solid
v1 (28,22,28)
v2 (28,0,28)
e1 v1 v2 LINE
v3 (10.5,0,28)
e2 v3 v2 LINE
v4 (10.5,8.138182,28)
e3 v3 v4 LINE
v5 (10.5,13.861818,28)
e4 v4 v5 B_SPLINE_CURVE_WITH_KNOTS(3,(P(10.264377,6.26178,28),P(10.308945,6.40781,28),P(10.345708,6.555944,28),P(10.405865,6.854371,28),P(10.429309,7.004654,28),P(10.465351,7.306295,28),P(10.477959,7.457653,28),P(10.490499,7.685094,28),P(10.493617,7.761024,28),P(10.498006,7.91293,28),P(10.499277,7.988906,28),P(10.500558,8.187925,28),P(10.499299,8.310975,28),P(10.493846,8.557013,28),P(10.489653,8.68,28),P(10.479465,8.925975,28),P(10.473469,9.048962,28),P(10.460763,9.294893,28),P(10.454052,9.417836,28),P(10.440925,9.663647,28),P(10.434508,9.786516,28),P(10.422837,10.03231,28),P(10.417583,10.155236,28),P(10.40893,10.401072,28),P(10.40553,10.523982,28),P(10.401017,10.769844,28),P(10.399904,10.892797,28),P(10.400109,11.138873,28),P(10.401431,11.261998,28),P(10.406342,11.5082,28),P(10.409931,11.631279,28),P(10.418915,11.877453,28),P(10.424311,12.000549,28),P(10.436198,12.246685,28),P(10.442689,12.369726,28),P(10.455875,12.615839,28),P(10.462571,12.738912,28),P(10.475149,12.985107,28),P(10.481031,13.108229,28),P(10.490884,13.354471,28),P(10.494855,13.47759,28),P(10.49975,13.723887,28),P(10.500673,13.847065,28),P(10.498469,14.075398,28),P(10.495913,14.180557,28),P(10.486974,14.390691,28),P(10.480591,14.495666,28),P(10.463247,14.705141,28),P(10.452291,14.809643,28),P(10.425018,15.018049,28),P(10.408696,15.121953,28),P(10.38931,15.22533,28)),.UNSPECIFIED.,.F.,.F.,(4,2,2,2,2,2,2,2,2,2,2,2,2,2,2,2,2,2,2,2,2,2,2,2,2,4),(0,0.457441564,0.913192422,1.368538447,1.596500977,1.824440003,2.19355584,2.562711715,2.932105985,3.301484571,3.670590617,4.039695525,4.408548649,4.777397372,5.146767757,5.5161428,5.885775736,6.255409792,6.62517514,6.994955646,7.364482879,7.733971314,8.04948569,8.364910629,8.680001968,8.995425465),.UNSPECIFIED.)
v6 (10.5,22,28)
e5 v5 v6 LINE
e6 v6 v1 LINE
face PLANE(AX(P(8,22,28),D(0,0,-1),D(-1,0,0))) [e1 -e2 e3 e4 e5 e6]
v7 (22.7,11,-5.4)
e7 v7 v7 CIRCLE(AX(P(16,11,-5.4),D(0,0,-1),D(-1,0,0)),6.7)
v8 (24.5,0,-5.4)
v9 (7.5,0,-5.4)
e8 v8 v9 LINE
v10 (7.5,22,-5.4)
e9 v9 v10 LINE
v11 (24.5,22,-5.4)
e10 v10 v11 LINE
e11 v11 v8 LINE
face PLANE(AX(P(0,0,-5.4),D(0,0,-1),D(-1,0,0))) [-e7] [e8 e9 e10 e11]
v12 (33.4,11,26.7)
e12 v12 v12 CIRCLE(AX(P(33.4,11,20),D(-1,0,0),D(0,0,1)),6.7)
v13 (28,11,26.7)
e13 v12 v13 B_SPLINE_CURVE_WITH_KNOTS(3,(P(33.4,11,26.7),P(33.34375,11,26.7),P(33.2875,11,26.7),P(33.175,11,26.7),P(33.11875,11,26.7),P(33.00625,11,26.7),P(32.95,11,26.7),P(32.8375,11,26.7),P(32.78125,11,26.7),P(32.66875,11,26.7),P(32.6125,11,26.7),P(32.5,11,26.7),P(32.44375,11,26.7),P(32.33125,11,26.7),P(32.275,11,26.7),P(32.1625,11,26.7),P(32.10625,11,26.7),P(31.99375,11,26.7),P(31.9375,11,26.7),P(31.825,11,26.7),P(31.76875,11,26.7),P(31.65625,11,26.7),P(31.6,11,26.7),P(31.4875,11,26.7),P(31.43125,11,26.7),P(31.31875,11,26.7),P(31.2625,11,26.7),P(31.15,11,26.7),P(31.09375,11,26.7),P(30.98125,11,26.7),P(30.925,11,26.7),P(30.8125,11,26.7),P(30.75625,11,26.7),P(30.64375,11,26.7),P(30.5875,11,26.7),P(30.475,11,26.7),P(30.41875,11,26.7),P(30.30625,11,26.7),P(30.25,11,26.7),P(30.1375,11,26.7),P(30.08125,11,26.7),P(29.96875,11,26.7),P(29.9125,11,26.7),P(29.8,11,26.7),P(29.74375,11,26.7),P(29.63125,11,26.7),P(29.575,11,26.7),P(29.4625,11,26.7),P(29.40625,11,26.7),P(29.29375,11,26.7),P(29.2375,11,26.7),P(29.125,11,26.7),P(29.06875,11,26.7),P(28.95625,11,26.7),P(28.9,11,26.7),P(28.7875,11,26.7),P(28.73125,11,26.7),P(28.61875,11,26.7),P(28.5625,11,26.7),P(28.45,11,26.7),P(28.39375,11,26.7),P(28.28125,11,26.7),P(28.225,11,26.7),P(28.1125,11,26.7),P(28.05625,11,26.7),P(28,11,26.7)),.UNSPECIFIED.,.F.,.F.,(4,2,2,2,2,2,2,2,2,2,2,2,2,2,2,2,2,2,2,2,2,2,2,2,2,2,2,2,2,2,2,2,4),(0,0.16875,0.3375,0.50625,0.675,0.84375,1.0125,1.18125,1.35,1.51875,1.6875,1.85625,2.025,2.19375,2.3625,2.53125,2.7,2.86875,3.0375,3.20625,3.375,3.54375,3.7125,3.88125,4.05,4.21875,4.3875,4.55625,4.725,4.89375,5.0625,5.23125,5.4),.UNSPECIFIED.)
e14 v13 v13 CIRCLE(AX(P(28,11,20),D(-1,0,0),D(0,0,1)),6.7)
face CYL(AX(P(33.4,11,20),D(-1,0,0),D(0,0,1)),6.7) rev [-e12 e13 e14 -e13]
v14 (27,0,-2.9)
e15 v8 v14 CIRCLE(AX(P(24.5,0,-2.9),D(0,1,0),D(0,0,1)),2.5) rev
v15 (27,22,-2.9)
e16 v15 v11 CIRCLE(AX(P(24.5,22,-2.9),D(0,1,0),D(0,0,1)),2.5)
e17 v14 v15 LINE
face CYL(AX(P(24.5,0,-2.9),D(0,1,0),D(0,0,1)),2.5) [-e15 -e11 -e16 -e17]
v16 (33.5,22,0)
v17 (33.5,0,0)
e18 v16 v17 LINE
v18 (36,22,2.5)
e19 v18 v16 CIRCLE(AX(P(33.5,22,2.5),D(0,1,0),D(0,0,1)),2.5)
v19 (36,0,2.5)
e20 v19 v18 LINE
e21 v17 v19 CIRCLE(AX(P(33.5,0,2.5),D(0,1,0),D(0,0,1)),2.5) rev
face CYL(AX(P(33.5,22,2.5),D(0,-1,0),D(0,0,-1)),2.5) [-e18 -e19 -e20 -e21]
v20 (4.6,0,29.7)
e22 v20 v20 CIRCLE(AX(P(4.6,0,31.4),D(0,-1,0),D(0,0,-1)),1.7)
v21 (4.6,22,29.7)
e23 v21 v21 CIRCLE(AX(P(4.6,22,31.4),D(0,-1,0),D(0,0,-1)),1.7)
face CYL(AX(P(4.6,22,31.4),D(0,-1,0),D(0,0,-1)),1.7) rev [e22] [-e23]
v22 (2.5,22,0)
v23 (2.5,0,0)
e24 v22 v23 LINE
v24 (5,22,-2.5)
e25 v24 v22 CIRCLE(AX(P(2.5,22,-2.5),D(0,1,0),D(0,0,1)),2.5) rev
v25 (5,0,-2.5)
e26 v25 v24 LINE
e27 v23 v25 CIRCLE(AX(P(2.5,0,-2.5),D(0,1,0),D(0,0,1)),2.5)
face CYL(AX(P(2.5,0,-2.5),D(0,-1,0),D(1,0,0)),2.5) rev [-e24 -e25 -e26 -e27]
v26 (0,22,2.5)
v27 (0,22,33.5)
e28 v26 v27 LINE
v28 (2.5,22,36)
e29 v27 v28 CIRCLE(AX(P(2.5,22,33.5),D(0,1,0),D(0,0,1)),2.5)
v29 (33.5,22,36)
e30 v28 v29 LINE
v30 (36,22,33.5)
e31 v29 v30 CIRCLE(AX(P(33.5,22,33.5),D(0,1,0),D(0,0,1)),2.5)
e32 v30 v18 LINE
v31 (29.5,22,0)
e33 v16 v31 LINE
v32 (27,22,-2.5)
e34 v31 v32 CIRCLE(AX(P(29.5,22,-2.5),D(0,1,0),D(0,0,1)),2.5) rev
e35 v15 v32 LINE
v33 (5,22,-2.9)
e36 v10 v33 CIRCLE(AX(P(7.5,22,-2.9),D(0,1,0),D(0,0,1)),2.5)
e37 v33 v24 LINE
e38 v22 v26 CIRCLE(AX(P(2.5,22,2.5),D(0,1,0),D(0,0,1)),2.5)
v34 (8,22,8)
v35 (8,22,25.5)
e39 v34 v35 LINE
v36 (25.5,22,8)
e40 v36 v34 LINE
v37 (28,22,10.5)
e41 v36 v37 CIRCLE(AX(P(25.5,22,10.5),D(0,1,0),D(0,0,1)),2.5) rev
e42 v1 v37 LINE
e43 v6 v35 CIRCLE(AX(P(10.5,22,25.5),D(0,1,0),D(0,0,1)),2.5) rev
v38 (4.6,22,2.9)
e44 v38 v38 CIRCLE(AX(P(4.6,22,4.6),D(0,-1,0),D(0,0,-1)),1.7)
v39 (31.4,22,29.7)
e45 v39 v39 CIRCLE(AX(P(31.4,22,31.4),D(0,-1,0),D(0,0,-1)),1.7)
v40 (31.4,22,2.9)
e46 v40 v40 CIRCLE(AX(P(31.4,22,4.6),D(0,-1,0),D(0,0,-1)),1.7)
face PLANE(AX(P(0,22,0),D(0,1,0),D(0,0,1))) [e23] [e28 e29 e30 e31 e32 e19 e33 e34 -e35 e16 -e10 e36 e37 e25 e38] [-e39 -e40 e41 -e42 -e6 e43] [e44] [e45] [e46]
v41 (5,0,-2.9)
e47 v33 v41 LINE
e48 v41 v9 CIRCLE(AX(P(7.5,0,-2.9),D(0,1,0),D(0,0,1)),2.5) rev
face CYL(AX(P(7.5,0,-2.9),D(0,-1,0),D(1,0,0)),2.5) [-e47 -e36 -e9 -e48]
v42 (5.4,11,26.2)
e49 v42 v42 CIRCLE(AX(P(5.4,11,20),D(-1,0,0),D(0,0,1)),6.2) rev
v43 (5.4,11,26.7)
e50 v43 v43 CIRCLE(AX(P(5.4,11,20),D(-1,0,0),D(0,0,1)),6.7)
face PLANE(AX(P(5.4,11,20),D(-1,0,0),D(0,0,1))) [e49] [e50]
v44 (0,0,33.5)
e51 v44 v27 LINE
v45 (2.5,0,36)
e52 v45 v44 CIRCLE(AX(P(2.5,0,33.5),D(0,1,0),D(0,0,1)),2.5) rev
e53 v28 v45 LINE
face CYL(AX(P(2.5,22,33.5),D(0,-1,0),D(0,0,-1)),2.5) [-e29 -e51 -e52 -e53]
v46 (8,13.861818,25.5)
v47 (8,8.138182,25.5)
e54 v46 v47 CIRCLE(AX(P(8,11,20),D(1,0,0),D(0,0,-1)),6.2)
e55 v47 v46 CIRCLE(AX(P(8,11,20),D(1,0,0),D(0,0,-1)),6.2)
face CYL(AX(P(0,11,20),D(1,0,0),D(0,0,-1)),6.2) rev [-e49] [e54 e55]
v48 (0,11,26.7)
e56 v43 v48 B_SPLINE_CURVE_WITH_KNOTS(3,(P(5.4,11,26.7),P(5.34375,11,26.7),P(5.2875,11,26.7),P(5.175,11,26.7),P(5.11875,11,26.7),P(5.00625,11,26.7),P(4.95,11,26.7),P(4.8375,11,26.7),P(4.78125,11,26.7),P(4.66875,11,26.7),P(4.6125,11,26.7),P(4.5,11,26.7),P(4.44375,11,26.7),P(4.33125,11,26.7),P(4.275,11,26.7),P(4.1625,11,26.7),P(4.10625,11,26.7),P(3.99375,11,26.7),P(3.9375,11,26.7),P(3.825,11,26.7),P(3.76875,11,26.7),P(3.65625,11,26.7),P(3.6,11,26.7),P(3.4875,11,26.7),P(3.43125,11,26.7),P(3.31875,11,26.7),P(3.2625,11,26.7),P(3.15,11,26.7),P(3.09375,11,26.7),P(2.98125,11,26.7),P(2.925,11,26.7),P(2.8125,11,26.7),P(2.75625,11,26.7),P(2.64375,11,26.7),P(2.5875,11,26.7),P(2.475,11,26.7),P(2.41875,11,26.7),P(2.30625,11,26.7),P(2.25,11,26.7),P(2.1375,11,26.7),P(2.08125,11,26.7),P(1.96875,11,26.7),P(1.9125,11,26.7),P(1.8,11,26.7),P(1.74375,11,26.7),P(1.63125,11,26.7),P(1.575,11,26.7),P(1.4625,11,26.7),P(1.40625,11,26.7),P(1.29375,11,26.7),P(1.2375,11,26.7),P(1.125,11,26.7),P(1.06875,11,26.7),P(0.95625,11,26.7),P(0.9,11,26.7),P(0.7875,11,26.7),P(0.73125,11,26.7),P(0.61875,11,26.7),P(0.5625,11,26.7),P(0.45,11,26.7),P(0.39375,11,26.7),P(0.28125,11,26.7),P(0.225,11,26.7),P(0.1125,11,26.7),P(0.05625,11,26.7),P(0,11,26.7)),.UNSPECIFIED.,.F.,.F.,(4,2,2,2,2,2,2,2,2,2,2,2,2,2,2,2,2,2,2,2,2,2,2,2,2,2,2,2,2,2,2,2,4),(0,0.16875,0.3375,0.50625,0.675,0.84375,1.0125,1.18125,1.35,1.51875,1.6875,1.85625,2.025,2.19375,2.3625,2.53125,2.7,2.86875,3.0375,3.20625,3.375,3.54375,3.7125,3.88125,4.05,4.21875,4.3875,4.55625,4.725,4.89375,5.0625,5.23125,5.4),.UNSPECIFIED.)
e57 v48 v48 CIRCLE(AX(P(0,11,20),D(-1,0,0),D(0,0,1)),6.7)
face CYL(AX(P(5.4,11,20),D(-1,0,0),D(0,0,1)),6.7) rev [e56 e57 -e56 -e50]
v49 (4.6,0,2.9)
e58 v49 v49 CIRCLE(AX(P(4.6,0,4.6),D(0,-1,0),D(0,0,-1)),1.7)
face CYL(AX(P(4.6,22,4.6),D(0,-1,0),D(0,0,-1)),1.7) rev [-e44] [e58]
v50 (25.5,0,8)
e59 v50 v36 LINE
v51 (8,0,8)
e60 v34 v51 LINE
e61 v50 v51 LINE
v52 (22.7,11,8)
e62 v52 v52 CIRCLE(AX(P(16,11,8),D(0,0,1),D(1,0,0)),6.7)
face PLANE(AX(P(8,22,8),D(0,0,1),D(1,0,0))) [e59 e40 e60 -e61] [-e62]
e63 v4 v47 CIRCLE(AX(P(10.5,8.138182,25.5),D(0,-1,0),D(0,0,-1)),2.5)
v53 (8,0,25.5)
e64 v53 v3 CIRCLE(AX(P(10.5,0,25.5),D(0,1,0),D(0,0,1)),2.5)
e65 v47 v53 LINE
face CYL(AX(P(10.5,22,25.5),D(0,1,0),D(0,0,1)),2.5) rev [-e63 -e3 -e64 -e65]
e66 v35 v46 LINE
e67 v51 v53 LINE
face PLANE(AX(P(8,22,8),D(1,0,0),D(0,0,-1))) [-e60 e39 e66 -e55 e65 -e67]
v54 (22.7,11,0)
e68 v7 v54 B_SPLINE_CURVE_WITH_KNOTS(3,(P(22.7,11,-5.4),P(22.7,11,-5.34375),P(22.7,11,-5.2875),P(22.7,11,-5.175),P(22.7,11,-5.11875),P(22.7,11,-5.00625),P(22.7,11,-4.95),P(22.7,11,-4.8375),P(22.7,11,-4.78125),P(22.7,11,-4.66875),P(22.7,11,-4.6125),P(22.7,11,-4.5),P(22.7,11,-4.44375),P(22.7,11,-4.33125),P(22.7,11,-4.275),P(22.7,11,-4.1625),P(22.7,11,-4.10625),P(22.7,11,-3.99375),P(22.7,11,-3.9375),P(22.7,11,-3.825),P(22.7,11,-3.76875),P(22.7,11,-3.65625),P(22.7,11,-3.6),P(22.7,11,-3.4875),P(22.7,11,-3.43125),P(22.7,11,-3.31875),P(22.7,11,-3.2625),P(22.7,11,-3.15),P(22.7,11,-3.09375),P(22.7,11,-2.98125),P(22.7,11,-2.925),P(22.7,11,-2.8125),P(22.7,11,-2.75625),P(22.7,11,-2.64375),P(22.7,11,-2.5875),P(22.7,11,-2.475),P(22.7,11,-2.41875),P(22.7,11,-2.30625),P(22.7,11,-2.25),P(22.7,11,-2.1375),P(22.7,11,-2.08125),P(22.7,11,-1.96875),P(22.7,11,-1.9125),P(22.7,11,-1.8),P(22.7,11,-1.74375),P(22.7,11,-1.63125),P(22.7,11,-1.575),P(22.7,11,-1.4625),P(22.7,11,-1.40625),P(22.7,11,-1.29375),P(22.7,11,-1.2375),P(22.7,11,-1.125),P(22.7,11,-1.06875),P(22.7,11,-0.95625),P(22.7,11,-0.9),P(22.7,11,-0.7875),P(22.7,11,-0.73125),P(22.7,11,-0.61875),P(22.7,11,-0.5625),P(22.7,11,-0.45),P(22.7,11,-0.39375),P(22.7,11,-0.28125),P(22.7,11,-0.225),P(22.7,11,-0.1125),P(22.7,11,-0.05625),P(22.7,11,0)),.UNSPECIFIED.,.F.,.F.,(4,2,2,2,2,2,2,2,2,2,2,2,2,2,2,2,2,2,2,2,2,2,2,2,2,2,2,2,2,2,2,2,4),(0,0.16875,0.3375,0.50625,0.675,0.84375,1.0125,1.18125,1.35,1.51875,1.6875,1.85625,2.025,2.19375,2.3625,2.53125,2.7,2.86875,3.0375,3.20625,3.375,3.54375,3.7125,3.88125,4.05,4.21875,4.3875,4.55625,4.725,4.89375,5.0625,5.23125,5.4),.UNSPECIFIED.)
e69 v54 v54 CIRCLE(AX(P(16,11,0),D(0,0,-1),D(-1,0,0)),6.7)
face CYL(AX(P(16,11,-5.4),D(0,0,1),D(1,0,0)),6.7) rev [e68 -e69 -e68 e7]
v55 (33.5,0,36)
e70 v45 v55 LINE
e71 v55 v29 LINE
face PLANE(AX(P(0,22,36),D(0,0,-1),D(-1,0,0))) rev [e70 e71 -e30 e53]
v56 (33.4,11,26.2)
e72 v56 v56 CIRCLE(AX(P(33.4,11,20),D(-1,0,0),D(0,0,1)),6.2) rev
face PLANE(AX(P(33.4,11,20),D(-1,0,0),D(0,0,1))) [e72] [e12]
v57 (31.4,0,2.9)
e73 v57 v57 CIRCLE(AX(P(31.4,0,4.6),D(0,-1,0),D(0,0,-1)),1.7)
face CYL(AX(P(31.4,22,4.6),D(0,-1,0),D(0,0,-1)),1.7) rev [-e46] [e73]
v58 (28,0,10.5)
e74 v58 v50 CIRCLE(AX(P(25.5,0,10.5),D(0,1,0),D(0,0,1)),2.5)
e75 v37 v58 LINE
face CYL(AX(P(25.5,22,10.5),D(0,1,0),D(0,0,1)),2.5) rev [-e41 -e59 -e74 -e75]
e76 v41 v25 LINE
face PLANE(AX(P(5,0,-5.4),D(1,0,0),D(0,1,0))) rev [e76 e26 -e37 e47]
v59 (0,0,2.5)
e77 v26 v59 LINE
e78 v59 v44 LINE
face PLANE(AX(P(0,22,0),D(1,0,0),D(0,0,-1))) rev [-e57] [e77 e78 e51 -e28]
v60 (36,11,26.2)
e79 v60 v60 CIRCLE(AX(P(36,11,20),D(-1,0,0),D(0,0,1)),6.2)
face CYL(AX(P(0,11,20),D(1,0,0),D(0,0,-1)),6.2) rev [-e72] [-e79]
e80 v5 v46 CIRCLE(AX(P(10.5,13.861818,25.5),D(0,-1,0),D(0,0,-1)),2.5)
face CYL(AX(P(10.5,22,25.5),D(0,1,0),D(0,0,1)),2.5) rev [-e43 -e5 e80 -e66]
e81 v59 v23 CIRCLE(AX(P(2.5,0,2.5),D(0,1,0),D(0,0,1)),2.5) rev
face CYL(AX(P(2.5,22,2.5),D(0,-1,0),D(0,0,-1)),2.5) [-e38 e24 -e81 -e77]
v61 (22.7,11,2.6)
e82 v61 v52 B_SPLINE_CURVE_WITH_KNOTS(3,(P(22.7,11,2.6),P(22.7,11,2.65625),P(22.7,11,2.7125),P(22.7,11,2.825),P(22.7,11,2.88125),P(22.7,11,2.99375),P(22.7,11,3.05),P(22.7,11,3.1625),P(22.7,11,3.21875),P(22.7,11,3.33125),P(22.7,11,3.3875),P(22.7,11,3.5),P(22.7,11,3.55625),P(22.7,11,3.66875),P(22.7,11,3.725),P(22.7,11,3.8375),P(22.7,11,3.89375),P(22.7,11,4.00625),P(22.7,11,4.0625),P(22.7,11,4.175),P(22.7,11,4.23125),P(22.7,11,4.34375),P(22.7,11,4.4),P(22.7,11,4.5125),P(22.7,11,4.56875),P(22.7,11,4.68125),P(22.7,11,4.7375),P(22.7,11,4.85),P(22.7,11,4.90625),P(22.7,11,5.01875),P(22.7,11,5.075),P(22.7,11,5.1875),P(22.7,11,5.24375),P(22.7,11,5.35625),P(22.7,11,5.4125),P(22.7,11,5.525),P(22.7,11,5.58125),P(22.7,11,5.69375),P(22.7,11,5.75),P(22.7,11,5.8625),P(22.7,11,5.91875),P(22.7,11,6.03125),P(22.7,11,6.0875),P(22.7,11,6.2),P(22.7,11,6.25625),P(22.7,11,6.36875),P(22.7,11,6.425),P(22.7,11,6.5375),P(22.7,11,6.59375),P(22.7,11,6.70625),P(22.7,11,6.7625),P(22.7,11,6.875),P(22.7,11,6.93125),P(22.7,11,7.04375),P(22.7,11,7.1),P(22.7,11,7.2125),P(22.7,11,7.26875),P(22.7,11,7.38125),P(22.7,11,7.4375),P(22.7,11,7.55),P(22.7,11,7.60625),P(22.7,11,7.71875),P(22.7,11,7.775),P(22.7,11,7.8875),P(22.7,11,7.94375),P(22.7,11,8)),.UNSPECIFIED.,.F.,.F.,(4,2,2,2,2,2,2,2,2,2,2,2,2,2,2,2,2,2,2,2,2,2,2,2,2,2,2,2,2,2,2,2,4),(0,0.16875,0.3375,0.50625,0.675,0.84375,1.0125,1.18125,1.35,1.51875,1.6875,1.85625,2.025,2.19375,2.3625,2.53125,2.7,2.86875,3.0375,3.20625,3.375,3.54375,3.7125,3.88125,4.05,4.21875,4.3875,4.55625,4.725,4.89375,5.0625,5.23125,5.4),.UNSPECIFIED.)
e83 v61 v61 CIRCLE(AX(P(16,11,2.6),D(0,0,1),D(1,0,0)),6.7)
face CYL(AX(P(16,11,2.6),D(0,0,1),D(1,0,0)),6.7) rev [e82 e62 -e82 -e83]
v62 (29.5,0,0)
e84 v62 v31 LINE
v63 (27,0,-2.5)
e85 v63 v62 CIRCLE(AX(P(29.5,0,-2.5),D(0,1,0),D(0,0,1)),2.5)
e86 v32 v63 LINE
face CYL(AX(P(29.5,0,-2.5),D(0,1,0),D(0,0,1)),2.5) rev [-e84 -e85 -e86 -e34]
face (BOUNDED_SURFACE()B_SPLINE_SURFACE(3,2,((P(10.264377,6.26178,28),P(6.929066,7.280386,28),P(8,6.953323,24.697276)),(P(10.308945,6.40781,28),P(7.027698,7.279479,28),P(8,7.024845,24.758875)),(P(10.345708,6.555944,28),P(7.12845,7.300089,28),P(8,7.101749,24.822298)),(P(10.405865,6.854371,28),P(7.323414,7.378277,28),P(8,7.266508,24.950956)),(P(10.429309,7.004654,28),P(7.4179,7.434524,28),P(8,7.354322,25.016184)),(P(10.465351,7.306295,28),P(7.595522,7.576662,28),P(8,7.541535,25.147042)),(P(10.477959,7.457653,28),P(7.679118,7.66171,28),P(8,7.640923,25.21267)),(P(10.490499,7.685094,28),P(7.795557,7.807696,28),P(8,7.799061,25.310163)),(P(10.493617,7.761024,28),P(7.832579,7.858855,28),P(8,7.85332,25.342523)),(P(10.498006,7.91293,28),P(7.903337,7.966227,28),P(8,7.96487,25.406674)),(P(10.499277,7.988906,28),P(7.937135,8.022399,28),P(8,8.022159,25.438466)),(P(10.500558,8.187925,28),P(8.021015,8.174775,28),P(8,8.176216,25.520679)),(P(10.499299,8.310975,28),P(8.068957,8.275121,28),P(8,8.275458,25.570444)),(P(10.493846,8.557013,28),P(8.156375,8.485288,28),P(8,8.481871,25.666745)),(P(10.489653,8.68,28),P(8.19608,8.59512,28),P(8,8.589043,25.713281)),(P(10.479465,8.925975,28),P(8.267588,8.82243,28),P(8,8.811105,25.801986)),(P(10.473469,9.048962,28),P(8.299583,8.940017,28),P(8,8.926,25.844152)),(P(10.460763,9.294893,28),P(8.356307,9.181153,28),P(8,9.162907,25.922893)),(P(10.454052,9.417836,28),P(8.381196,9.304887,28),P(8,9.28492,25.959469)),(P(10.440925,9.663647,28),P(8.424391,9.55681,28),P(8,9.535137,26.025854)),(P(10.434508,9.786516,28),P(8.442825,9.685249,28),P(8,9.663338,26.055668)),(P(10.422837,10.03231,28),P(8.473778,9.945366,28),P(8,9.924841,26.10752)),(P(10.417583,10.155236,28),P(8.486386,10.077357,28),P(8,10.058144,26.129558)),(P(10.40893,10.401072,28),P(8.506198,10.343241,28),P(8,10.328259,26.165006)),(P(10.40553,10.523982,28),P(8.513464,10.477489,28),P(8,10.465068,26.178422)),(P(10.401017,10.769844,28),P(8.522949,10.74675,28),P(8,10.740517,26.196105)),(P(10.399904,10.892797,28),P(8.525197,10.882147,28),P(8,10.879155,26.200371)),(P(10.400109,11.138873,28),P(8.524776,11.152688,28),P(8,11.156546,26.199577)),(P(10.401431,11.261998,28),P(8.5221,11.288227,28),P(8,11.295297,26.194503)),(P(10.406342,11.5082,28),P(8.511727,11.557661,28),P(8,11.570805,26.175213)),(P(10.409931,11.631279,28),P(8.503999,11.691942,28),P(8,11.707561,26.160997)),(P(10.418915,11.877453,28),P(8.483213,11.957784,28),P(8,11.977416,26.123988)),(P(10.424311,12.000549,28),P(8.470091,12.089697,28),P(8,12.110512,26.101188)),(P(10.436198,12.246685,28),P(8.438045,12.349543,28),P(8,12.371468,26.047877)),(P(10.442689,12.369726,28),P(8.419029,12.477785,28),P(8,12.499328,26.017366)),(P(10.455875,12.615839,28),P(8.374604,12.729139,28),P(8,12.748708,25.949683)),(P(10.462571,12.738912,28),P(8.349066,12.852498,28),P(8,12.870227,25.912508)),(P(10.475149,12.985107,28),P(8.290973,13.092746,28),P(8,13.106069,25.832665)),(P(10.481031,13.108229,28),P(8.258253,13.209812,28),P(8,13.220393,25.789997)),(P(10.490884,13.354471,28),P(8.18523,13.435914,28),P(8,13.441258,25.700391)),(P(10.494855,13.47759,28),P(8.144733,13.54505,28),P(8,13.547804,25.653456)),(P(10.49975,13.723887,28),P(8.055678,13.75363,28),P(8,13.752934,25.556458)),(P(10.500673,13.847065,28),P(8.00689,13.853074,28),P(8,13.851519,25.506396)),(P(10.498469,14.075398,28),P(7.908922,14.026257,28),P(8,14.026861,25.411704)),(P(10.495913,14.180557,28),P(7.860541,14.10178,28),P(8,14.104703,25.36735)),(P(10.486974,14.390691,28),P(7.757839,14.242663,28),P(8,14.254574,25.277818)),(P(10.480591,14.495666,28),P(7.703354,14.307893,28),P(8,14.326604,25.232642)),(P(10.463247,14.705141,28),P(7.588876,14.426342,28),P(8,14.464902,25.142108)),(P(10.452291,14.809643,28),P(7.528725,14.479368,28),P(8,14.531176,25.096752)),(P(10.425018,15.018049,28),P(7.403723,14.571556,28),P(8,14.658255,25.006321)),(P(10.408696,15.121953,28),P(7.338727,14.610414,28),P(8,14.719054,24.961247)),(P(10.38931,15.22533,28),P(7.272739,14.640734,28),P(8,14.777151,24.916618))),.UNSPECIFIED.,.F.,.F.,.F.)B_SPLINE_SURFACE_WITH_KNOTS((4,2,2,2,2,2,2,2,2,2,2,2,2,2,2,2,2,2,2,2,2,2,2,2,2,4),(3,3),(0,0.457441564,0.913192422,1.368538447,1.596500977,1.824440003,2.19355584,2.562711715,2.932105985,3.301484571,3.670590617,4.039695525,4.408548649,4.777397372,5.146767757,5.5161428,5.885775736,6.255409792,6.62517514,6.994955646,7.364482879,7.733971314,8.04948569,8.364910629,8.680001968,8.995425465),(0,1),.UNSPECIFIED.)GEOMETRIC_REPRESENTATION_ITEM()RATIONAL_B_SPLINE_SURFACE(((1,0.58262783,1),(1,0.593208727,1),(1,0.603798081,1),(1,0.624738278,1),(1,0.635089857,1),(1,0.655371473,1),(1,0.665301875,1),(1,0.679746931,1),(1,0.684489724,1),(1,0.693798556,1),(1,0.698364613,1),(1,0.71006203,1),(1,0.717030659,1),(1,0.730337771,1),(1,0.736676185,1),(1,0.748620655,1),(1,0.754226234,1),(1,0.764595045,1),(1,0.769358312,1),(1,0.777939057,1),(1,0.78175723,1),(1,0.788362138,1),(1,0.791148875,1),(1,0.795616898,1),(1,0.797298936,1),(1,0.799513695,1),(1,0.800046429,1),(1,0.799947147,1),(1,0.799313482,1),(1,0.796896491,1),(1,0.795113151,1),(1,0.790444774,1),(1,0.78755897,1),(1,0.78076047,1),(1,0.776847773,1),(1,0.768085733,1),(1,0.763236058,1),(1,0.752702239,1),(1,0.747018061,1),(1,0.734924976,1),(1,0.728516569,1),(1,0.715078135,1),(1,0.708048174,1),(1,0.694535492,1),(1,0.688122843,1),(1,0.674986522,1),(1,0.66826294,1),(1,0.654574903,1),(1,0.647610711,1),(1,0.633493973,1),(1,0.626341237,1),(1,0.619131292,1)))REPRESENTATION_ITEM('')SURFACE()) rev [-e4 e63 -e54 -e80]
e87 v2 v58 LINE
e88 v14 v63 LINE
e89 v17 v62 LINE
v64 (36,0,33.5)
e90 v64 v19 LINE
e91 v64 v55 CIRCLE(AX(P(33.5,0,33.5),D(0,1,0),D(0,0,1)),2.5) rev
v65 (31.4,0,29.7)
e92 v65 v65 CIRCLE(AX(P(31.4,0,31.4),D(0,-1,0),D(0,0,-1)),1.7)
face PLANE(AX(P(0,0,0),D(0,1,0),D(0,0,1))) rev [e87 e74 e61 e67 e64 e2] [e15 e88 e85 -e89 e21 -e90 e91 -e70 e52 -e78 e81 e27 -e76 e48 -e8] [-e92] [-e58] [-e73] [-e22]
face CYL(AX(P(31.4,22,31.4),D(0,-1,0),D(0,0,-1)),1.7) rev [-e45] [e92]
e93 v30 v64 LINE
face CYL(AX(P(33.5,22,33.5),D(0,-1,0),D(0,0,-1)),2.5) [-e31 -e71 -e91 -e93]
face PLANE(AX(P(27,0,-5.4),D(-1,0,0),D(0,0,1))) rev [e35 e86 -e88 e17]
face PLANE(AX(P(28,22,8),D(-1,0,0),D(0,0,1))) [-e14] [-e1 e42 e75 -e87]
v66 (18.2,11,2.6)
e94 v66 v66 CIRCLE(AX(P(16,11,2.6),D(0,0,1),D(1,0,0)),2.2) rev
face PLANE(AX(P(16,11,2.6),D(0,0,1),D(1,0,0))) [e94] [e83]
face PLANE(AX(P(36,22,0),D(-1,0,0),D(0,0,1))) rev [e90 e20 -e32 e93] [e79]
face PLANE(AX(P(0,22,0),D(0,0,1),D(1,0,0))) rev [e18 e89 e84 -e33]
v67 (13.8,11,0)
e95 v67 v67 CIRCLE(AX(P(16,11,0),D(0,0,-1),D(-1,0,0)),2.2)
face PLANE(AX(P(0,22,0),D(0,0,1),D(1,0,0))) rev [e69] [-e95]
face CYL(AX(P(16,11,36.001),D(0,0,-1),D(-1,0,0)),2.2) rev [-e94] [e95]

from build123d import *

# Parameters (mm, degrees)
SKETCH3_W               = 36
SKETCH3_H               = 36
SKETCH3_W_2             = 20
SKETCH3_H_2             = 20
BOSS_EXTRUDE1_DEPTH     = 22
CUT_EXTRUDE1_REACH      = 57.462
SKETCH4_R               = 2.2
CUT_EXTRUDE2_DEPTH      = 56.461698495
CUT_EXTRUDE2_DEPTH_BACK = 56.461698495
SKETCH5_R               = 6.2
SKETCH6_W               = 22
SKETCH6_H               = 22
SKETCH6_R               = 6.7
BOSS_EXTRUDE2_DEPTH     = 5.4
SKETCH7_R               = 6.7
CUT_EXTRUDE3_DEPTH      = 5.4
SKETCH8_R               = 6.7
CUT_EXTRUDE4_DEPTH      = 5.4
SKETCH9_R               = 6.7
CUT_EXTRUDE5_DEPTH      = 5.4
FILLET2_R               = 2.5
FILLET3_R               = 2.5
FILLET4_R               = 2.5
SKETCH10_R              = 1.7
CUT_EXTRUDE6_DEPTH      = 56.461698535


with BuildPart() as part:
    # Sketch3 → Boss-Extrude1 (new body)
    with BuildSketch(Plane(origin=(0, 0, 0), x_dir=(1, 0, 0), z_dir=(0, 1, 0))):
        with Locations((18, -18)):
            Rectangle(SKETCH3_W, SKETCH3_H)
        with Locations((18, -18)):
            Rectangle(SKETCH3_W_2, SKETCH3_H_2, mode=Mode.SUBTRACT)
    extrude(amount=BOSS_EXTRUDE1_DEPTH)

    # Sketch4 → Cut-Extrude1 (cut, up to next)
    with BuildSketch(Plane(origin=(0, 0, 0), x_dir=(-1, 0, 0), z_dir=(0, 0, -1)), mode=Mode.PRIVATE) as cut_extrude1_sk1:
        with Locations((-16, 11)):
            Circle(SKETCH4_R)
    cut_extrude1_tool1 = extrude(cut_extrude1_sk1.sketch, amount=-CUT_EXTRUDE1_REACH, mode=Mode.PRIVATE) & part.part
    add(cut_extrude1_tool1.solids().sort_by_distance((16, 11, 0))[0], mode=Mode.SUBTRACT)

    # Sketch5 → Cut-Extrude2 (cut, two sides: drawn at the far end of the back side and taken through both)
    with BuildSketch(Plane(origin=(36, 0, 0), x_dir=(0, 0, -1), z_dir=(1, 0, 0)).offset(-CUT_EXTRUDE2_DEPTH_BACK)):
        with Locations(Location((-20, 11, 0), (0, 0, 180))):
            Circle(SKETCH5_R)
    extrude(amount=CUT_EXTRUDE2_DEPTH + CUT_EXTRUDE2_DEPTH_BACK, mode=Mode.SUBTRACT)

    # Sketch6 → Boss-Extrude2 (add)
    with BuildSketch(Plane(origin=(0, 0, 0), x_dir=(-1, 0, 0), z_dir=(0, 0, -1))):
        with Locations((-16, 11)):
            Rectangle(SKETCH6_W, SKETCH6_H)
        with Locations(Location((-16, 11, 0), (0, 0, 180))):
            Circle(SKETCH6_R, mode=Mode.SUBTRACT)
    extrude(amount=BOSS_EXTRUDE2_DEPTH)

    # Sketch7 → Cut-Extrude3 (cut)
    with BuildSketch(Plane.XY.offset(8)):
        with Locations((16, 11)):
            Circle(SKETCH7_R)
    extrude(amount=-CUT_EXTRUDE3_DEPTH, mode=Mode.SUBTRACT)

    # Sketch8 → Cut-Extrude4 (cut)
    with BuildSketch(Plane.ZY.offset(-28)):
        with Locations((20, 11)):
            Circle(SKETCH8_R)
    extrude(amount=-CUT_EXTRUDE4_DEPTH, mode=Mode.SUBTRACT)

    # Sketch9 → Cut-Extrude5 (cut)
    with BuildSketch(Plane.ZY):
        with Locations((20, 11)):
            Circle(SKETCH9_R)
    extrude(amount=-CUT_EXTRUDE5_DEPTH, mode=Mode.SUBTRACT)

    # Fillet2
    fillet2_edges = [part.edges().sort_by_distance(p)[0] for p in [
        (5, 11, -5.4),
        (27, 11, -5.4),
        (5, 11, 0),
        (27, 11, 0),
    ]]
    fillet(fillet2_edges, radius=FILLET2_R)

    # Fillet3
    fillet3_edges = [part.edges().sort_by_distance(p)[0] for p in [
        (8, 11, 28),
        (28, 11, 8),
    ]]
    fillet(fillet3_edges, radius=FILLET3_R)

    # Fillet4
    fillet4_edges = [part.edges().sort_by_distance(p)[0] for p in [
        (0, 11, 0),
        (36, 11, 0),
        (36, 11, 36),
        (0, 11, 36),
    ]]
    fillet(fillet4_edges, radius=FILLET4_R - 0.0001)  # a hair under: the kernel refuses the full size

    # Sketch10 → Cut-Extrude6 (cut, through all)
    with BuildSketch(Plane(origin=(0, 0, 0), x_dir=(-1, 0, 0), z_dir=(0, -1, 0))):
        with Locations(Location((-31.4, -4.6, 0), (0, 0, 90))):
            Circle(SKETCH10_R)
        with Locations(Location((-4.6, -4.6, 0), (0, 0, 90))):
            Circle(SKETCH10_R)
        with Locations(Location((-4.6, -31.4, 0), (0, 0, 90))):
            Circle(SKETCH10_R)
        with Locations(Location((-31.4, -31.4, 0), (0, 0, 90))):
            Circle(SKETCH10_R)
    extrude(amount=-CUT_EXTRUDE6_DEPTH, mode=Mode.SUBTRACT)


solid = part.part
